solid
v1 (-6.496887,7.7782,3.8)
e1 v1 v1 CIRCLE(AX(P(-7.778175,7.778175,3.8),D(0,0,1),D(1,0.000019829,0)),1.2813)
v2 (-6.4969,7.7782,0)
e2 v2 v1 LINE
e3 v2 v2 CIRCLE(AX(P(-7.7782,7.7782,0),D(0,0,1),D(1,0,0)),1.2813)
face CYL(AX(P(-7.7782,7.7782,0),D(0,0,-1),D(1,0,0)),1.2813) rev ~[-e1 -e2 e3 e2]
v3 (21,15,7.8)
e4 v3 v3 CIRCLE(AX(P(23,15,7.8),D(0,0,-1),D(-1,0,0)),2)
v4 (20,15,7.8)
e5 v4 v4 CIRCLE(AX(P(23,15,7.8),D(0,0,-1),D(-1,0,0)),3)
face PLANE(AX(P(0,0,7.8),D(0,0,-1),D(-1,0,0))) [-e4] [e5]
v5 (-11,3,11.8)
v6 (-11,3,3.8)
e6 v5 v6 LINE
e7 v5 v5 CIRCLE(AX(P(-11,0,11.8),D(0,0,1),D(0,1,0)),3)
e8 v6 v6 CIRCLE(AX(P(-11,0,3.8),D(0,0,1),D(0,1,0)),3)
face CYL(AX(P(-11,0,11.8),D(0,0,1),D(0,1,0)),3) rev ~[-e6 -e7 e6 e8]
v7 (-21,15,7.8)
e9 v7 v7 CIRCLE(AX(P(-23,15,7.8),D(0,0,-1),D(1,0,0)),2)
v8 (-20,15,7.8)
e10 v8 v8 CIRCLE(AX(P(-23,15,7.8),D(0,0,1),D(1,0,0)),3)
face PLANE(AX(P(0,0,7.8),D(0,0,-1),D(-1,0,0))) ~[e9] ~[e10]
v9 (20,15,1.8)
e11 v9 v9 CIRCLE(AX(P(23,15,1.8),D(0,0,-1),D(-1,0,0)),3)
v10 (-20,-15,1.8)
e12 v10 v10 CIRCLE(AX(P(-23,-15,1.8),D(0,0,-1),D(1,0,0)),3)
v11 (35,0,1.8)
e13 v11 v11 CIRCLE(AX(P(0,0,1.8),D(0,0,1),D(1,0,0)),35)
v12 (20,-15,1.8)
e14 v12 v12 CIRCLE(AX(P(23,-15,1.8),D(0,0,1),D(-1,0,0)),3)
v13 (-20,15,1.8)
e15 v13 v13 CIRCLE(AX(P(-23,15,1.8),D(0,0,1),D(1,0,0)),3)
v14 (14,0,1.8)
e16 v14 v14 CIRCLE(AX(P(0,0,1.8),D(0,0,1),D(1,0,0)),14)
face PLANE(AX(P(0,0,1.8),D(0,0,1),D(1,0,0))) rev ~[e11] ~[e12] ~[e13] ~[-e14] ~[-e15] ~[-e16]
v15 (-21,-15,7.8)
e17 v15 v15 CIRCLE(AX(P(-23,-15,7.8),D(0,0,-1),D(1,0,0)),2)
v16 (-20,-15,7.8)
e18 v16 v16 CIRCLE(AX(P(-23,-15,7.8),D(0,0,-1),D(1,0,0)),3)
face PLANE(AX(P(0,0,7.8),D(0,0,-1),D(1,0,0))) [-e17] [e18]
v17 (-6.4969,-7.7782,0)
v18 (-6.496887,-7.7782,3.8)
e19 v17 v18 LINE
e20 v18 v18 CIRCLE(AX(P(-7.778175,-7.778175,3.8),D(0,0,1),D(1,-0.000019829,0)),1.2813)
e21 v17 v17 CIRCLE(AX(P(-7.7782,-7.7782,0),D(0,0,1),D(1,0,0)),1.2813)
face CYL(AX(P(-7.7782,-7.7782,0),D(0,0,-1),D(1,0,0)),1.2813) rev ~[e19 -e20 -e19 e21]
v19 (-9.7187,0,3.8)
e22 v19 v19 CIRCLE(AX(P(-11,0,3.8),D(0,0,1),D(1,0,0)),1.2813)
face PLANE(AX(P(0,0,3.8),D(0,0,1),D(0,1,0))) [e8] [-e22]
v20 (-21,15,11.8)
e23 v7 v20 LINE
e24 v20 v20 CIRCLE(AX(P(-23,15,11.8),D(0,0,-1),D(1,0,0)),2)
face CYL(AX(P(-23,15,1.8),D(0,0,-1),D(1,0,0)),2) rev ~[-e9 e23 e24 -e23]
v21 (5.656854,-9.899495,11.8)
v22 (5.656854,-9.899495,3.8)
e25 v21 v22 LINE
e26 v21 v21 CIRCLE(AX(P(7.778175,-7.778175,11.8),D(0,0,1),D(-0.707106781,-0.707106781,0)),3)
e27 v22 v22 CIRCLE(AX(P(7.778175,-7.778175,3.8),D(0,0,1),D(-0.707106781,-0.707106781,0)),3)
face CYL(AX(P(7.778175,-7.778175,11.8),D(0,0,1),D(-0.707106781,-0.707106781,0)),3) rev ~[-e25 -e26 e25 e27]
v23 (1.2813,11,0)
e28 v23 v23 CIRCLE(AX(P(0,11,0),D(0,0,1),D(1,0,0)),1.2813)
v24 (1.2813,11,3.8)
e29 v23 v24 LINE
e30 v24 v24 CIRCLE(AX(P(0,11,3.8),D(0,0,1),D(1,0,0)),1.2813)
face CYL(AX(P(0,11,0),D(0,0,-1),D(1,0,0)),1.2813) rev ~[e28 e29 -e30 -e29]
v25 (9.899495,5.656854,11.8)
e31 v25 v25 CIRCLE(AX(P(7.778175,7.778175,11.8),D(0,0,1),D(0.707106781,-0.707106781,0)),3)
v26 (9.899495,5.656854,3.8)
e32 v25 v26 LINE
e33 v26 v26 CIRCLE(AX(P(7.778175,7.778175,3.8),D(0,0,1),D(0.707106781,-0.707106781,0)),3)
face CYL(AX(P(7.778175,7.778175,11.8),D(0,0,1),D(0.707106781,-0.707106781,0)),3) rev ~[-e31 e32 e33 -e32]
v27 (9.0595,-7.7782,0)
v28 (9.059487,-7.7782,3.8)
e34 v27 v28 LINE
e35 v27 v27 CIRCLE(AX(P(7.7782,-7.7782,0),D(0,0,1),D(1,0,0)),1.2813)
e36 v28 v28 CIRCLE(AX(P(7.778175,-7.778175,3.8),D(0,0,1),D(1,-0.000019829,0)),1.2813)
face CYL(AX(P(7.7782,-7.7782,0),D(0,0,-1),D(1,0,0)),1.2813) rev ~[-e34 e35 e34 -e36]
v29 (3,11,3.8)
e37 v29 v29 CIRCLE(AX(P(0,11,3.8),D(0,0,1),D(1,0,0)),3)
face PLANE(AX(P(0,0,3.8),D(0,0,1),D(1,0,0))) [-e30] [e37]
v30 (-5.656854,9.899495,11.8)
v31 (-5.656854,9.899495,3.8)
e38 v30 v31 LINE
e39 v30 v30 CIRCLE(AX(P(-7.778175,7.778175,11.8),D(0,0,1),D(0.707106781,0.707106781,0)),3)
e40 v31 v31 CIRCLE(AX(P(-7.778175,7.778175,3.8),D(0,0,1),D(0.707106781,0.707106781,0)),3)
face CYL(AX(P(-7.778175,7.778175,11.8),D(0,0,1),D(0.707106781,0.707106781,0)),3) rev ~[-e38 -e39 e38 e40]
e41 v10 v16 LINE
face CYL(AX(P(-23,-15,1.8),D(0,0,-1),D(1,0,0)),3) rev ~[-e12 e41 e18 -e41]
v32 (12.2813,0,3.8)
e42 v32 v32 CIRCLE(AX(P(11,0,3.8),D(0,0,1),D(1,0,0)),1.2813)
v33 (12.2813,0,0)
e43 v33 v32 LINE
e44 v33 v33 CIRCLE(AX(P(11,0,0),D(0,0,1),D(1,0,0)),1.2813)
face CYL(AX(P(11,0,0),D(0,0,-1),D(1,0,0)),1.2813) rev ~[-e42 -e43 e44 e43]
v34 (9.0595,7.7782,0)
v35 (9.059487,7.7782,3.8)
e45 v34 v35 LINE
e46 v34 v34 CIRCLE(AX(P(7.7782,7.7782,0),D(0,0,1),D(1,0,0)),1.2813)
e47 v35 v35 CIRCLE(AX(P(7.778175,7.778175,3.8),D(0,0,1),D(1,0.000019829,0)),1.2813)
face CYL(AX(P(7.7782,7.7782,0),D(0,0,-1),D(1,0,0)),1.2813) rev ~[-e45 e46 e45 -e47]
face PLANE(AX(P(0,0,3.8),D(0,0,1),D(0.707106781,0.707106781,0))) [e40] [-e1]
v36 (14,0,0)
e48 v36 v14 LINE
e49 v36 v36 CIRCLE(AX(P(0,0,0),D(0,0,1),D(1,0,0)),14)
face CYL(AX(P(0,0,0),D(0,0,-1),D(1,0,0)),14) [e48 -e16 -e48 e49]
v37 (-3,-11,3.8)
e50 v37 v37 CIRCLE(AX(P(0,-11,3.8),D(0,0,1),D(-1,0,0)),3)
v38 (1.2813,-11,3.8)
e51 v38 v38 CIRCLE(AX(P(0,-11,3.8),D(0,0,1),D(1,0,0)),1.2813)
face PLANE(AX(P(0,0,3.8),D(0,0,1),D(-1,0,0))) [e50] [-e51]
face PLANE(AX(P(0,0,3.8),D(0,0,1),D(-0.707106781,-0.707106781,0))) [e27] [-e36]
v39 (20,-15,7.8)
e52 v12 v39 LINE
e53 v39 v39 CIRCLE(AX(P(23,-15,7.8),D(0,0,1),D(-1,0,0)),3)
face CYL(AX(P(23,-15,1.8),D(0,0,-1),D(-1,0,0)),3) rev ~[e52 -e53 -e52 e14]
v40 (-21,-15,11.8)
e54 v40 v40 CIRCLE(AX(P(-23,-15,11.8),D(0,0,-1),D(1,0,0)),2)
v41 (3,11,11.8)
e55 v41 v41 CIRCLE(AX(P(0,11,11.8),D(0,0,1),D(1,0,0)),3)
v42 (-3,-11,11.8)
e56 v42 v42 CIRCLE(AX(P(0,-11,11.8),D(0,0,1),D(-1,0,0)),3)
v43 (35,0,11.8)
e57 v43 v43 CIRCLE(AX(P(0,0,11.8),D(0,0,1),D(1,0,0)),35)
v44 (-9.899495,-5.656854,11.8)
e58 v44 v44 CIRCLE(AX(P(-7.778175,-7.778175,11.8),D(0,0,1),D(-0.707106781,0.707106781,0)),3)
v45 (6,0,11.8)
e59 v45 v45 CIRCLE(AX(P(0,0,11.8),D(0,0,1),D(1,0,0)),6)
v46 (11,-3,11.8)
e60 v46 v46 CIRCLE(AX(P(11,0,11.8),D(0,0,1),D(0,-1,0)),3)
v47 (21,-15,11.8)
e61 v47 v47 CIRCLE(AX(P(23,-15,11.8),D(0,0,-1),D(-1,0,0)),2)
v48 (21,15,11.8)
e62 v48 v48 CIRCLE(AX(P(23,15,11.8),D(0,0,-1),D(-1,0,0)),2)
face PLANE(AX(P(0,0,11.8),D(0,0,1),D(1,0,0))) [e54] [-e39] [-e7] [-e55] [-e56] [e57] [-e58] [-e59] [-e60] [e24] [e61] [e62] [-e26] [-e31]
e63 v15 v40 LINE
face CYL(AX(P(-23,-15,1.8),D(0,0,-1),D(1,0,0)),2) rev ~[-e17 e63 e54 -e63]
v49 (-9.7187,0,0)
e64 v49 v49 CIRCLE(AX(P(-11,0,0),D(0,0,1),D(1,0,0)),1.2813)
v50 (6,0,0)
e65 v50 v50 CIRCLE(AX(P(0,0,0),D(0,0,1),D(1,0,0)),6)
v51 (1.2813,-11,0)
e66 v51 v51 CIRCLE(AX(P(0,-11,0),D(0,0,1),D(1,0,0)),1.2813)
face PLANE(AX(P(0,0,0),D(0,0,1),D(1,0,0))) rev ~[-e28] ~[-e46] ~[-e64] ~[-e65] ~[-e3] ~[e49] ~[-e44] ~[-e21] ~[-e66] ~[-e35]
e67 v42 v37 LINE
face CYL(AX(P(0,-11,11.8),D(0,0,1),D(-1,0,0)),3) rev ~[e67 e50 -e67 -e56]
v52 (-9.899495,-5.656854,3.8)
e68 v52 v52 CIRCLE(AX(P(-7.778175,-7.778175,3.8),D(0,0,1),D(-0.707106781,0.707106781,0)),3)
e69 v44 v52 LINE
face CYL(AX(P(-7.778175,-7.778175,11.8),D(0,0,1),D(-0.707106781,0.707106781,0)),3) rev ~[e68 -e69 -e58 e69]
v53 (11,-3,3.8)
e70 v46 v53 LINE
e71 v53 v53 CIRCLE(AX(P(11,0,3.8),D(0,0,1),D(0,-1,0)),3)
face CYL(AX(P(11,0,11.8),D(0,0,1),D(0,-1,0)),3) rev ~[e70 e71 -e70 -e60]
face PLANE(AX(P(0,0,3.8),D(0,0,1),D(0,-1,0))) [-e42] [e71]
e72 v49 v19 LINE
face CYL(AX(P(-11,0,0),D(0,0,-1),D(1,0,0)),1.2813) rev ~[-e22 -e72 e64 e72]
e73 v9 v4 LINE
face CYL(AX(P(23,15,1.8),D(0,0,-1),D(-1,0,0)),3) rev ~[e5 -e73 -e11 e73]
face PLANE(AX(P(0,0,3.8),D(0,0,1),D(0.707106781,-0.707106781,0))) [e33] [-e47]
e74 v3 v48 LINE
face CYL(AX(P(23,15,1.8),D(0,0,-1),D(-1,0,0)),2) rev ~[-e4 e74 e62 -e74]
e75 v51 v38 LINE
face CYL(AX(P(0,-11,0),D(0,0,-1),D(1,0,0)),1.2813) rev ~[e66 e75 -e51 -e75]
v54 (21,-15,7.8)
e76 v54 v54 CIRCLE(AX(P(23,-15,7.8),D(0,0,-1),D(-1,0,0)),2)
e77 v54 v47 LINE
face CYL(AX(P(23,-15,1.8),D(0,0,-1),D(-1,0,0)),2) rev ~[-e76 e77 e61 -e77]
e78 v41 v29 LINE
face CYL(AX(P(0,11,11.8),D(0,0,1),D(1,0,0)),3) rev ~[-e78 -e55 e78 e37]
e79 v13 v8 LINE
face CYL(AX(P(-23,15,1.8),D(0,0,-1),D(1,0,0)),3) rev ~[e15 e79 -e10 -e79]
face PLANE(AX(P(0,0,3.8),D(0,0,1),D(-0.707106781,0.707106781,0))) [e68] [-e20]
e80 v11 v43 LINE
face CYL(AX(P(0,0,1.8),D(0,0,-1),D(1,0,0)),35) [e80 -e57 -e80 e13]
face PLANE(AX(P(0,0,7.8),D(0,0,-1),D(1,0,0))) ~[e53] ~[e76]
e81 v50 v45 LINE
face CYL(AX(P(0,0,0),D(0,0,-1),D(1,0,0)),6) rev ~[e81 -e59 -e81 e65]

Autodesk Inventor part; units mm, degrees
ref_plane "YZ Plane" through (0, 0, 0) normal (1, 0, 0) x (0, 1, 0)
ref_plane "XZ Plane" through (0, 0, 0) normal (0, 1, 0) x (-1, 0, 0)
ref_plane "XY Plane" through (0, 0, 0) normal (0, 0, 1) x (1, 0, 0)
sketch "Эскиз1" plane through (0, 0, 0) normal (0, 0, 1) x (1, 0, 0)
  circle A0 centre (0, 0) radius 14
  circle A1 centre (-11, 0) radius 1.2813
  circle A2 centre (-7.7782, -7.7782) radius 1.2813
  circle A3 centre (0, -11) radius 1.2813
  circle A4 centre (7.7782, -7.7782) radius 1.2813
  circle A5 centre (11, 0) radius 1.2813
  circle A6 centre (7.7782, 7.7782) radius 1.2813
  circle A7 centre (0, 11) radius 1.2813
  circle A8 centre (-7.7782, 7.7782) radius 1.2813
  circle A9 centre (0, 0) radius 6
  dimension "d3" = 12
extrude "Выдавливание1" add sketch "Эскиз1" along normal blind 1.8
sketch "Эскиз2" plane through (0, 0, 1.8) normal (0, 0, 1) x (1, 0, 0)
  circle A0 centre (0, 0) radius 14 projected
  circle A1 centre (0, 0) radius 6 projected
  circle A2 centre (-7.7782, 7.7782) radius 1.2813 projected
  circle A3 centre (0, 11) radius 1.2813 projected
  circle A4 centre (7.7782, 7.7782) radius 1.2813 projected
  circle A5 centre (11, 0) radius 1.2813 projected
  circle A6 centre (7.7782, -7.7782) radius 1.2813 projected
  circle A7 centre (0, -11) radius 1.2813 projected
  circle A8 centre (-7.7782, -7.7782) radius 1.2813 projected
  circle A9 centre (-11, 0) radius 1.2813 projected
  circle A10 centre (0, 0) radius 35
  dimension "d4" = 70
extrude "Выдавливание2" add sketch "Эскиз2" along normal blind 10 contours A0 | A10
sketch "Эскиз3" plane through (0, 0, 11.8) normal (0, 0, 1) x (1, 0, 0)
  circle A0 centre (0, 11) radius 1.2813 projected
  circle A1 centre (0, 11) radius 3
  point P0 (0, 0)
  dimension "d7" = 6
extrude "Выдавливание3" cut sketch "Эскиз3" against normal blind 8
pattern_circular "Круговой массив1" count 8 over 360 about axis through (0, 0, 0) along (0, 0, 1) of "Выдавливание3"
sketch "Эскиз4" plane through (0, 0, 1.8) normal (0, 0, -1) x (-1, 0, 0)
  circle A0 centre (-23, 15) radius 2
  point P0 (0, 0)
  dimension "d13" = 4
  dimension "d14" = 15
  dimension "d15" = 23
extrude "Выдавливание4" cut sketch "Эскиз4" against normal through all
sketch "Эскиз5" plane through (0, 0, 1.8) normal (0, 0, -1) x (-1, 0, 0)
  circle A0 centre (-23, 15) radius 2 projected
  circle A1 centre (-23, 15) radius 3
  point P0 (0, 0)
  dimension "d18" = 6
extrude "Выдавливание5" cut sketch "Эскиз5" against normal blind 6 contours A0 | A1
mirror "Зеркальное отражение1" about plane through (0, 0, 0) normal (0, 1, 0) of "Выдавливание4", "Выдавливание5"
mirror "Зеркальное отражение2" about plane through (0, 0, 0) normal (1, 0, 0) of "Выдавливание4", "Выдавливание5", "Зеркальное отражение1"
properties part number "000.005.004.003 - ПОВОРОТНЫЙ ДИСК" material "Пластик АБС"
